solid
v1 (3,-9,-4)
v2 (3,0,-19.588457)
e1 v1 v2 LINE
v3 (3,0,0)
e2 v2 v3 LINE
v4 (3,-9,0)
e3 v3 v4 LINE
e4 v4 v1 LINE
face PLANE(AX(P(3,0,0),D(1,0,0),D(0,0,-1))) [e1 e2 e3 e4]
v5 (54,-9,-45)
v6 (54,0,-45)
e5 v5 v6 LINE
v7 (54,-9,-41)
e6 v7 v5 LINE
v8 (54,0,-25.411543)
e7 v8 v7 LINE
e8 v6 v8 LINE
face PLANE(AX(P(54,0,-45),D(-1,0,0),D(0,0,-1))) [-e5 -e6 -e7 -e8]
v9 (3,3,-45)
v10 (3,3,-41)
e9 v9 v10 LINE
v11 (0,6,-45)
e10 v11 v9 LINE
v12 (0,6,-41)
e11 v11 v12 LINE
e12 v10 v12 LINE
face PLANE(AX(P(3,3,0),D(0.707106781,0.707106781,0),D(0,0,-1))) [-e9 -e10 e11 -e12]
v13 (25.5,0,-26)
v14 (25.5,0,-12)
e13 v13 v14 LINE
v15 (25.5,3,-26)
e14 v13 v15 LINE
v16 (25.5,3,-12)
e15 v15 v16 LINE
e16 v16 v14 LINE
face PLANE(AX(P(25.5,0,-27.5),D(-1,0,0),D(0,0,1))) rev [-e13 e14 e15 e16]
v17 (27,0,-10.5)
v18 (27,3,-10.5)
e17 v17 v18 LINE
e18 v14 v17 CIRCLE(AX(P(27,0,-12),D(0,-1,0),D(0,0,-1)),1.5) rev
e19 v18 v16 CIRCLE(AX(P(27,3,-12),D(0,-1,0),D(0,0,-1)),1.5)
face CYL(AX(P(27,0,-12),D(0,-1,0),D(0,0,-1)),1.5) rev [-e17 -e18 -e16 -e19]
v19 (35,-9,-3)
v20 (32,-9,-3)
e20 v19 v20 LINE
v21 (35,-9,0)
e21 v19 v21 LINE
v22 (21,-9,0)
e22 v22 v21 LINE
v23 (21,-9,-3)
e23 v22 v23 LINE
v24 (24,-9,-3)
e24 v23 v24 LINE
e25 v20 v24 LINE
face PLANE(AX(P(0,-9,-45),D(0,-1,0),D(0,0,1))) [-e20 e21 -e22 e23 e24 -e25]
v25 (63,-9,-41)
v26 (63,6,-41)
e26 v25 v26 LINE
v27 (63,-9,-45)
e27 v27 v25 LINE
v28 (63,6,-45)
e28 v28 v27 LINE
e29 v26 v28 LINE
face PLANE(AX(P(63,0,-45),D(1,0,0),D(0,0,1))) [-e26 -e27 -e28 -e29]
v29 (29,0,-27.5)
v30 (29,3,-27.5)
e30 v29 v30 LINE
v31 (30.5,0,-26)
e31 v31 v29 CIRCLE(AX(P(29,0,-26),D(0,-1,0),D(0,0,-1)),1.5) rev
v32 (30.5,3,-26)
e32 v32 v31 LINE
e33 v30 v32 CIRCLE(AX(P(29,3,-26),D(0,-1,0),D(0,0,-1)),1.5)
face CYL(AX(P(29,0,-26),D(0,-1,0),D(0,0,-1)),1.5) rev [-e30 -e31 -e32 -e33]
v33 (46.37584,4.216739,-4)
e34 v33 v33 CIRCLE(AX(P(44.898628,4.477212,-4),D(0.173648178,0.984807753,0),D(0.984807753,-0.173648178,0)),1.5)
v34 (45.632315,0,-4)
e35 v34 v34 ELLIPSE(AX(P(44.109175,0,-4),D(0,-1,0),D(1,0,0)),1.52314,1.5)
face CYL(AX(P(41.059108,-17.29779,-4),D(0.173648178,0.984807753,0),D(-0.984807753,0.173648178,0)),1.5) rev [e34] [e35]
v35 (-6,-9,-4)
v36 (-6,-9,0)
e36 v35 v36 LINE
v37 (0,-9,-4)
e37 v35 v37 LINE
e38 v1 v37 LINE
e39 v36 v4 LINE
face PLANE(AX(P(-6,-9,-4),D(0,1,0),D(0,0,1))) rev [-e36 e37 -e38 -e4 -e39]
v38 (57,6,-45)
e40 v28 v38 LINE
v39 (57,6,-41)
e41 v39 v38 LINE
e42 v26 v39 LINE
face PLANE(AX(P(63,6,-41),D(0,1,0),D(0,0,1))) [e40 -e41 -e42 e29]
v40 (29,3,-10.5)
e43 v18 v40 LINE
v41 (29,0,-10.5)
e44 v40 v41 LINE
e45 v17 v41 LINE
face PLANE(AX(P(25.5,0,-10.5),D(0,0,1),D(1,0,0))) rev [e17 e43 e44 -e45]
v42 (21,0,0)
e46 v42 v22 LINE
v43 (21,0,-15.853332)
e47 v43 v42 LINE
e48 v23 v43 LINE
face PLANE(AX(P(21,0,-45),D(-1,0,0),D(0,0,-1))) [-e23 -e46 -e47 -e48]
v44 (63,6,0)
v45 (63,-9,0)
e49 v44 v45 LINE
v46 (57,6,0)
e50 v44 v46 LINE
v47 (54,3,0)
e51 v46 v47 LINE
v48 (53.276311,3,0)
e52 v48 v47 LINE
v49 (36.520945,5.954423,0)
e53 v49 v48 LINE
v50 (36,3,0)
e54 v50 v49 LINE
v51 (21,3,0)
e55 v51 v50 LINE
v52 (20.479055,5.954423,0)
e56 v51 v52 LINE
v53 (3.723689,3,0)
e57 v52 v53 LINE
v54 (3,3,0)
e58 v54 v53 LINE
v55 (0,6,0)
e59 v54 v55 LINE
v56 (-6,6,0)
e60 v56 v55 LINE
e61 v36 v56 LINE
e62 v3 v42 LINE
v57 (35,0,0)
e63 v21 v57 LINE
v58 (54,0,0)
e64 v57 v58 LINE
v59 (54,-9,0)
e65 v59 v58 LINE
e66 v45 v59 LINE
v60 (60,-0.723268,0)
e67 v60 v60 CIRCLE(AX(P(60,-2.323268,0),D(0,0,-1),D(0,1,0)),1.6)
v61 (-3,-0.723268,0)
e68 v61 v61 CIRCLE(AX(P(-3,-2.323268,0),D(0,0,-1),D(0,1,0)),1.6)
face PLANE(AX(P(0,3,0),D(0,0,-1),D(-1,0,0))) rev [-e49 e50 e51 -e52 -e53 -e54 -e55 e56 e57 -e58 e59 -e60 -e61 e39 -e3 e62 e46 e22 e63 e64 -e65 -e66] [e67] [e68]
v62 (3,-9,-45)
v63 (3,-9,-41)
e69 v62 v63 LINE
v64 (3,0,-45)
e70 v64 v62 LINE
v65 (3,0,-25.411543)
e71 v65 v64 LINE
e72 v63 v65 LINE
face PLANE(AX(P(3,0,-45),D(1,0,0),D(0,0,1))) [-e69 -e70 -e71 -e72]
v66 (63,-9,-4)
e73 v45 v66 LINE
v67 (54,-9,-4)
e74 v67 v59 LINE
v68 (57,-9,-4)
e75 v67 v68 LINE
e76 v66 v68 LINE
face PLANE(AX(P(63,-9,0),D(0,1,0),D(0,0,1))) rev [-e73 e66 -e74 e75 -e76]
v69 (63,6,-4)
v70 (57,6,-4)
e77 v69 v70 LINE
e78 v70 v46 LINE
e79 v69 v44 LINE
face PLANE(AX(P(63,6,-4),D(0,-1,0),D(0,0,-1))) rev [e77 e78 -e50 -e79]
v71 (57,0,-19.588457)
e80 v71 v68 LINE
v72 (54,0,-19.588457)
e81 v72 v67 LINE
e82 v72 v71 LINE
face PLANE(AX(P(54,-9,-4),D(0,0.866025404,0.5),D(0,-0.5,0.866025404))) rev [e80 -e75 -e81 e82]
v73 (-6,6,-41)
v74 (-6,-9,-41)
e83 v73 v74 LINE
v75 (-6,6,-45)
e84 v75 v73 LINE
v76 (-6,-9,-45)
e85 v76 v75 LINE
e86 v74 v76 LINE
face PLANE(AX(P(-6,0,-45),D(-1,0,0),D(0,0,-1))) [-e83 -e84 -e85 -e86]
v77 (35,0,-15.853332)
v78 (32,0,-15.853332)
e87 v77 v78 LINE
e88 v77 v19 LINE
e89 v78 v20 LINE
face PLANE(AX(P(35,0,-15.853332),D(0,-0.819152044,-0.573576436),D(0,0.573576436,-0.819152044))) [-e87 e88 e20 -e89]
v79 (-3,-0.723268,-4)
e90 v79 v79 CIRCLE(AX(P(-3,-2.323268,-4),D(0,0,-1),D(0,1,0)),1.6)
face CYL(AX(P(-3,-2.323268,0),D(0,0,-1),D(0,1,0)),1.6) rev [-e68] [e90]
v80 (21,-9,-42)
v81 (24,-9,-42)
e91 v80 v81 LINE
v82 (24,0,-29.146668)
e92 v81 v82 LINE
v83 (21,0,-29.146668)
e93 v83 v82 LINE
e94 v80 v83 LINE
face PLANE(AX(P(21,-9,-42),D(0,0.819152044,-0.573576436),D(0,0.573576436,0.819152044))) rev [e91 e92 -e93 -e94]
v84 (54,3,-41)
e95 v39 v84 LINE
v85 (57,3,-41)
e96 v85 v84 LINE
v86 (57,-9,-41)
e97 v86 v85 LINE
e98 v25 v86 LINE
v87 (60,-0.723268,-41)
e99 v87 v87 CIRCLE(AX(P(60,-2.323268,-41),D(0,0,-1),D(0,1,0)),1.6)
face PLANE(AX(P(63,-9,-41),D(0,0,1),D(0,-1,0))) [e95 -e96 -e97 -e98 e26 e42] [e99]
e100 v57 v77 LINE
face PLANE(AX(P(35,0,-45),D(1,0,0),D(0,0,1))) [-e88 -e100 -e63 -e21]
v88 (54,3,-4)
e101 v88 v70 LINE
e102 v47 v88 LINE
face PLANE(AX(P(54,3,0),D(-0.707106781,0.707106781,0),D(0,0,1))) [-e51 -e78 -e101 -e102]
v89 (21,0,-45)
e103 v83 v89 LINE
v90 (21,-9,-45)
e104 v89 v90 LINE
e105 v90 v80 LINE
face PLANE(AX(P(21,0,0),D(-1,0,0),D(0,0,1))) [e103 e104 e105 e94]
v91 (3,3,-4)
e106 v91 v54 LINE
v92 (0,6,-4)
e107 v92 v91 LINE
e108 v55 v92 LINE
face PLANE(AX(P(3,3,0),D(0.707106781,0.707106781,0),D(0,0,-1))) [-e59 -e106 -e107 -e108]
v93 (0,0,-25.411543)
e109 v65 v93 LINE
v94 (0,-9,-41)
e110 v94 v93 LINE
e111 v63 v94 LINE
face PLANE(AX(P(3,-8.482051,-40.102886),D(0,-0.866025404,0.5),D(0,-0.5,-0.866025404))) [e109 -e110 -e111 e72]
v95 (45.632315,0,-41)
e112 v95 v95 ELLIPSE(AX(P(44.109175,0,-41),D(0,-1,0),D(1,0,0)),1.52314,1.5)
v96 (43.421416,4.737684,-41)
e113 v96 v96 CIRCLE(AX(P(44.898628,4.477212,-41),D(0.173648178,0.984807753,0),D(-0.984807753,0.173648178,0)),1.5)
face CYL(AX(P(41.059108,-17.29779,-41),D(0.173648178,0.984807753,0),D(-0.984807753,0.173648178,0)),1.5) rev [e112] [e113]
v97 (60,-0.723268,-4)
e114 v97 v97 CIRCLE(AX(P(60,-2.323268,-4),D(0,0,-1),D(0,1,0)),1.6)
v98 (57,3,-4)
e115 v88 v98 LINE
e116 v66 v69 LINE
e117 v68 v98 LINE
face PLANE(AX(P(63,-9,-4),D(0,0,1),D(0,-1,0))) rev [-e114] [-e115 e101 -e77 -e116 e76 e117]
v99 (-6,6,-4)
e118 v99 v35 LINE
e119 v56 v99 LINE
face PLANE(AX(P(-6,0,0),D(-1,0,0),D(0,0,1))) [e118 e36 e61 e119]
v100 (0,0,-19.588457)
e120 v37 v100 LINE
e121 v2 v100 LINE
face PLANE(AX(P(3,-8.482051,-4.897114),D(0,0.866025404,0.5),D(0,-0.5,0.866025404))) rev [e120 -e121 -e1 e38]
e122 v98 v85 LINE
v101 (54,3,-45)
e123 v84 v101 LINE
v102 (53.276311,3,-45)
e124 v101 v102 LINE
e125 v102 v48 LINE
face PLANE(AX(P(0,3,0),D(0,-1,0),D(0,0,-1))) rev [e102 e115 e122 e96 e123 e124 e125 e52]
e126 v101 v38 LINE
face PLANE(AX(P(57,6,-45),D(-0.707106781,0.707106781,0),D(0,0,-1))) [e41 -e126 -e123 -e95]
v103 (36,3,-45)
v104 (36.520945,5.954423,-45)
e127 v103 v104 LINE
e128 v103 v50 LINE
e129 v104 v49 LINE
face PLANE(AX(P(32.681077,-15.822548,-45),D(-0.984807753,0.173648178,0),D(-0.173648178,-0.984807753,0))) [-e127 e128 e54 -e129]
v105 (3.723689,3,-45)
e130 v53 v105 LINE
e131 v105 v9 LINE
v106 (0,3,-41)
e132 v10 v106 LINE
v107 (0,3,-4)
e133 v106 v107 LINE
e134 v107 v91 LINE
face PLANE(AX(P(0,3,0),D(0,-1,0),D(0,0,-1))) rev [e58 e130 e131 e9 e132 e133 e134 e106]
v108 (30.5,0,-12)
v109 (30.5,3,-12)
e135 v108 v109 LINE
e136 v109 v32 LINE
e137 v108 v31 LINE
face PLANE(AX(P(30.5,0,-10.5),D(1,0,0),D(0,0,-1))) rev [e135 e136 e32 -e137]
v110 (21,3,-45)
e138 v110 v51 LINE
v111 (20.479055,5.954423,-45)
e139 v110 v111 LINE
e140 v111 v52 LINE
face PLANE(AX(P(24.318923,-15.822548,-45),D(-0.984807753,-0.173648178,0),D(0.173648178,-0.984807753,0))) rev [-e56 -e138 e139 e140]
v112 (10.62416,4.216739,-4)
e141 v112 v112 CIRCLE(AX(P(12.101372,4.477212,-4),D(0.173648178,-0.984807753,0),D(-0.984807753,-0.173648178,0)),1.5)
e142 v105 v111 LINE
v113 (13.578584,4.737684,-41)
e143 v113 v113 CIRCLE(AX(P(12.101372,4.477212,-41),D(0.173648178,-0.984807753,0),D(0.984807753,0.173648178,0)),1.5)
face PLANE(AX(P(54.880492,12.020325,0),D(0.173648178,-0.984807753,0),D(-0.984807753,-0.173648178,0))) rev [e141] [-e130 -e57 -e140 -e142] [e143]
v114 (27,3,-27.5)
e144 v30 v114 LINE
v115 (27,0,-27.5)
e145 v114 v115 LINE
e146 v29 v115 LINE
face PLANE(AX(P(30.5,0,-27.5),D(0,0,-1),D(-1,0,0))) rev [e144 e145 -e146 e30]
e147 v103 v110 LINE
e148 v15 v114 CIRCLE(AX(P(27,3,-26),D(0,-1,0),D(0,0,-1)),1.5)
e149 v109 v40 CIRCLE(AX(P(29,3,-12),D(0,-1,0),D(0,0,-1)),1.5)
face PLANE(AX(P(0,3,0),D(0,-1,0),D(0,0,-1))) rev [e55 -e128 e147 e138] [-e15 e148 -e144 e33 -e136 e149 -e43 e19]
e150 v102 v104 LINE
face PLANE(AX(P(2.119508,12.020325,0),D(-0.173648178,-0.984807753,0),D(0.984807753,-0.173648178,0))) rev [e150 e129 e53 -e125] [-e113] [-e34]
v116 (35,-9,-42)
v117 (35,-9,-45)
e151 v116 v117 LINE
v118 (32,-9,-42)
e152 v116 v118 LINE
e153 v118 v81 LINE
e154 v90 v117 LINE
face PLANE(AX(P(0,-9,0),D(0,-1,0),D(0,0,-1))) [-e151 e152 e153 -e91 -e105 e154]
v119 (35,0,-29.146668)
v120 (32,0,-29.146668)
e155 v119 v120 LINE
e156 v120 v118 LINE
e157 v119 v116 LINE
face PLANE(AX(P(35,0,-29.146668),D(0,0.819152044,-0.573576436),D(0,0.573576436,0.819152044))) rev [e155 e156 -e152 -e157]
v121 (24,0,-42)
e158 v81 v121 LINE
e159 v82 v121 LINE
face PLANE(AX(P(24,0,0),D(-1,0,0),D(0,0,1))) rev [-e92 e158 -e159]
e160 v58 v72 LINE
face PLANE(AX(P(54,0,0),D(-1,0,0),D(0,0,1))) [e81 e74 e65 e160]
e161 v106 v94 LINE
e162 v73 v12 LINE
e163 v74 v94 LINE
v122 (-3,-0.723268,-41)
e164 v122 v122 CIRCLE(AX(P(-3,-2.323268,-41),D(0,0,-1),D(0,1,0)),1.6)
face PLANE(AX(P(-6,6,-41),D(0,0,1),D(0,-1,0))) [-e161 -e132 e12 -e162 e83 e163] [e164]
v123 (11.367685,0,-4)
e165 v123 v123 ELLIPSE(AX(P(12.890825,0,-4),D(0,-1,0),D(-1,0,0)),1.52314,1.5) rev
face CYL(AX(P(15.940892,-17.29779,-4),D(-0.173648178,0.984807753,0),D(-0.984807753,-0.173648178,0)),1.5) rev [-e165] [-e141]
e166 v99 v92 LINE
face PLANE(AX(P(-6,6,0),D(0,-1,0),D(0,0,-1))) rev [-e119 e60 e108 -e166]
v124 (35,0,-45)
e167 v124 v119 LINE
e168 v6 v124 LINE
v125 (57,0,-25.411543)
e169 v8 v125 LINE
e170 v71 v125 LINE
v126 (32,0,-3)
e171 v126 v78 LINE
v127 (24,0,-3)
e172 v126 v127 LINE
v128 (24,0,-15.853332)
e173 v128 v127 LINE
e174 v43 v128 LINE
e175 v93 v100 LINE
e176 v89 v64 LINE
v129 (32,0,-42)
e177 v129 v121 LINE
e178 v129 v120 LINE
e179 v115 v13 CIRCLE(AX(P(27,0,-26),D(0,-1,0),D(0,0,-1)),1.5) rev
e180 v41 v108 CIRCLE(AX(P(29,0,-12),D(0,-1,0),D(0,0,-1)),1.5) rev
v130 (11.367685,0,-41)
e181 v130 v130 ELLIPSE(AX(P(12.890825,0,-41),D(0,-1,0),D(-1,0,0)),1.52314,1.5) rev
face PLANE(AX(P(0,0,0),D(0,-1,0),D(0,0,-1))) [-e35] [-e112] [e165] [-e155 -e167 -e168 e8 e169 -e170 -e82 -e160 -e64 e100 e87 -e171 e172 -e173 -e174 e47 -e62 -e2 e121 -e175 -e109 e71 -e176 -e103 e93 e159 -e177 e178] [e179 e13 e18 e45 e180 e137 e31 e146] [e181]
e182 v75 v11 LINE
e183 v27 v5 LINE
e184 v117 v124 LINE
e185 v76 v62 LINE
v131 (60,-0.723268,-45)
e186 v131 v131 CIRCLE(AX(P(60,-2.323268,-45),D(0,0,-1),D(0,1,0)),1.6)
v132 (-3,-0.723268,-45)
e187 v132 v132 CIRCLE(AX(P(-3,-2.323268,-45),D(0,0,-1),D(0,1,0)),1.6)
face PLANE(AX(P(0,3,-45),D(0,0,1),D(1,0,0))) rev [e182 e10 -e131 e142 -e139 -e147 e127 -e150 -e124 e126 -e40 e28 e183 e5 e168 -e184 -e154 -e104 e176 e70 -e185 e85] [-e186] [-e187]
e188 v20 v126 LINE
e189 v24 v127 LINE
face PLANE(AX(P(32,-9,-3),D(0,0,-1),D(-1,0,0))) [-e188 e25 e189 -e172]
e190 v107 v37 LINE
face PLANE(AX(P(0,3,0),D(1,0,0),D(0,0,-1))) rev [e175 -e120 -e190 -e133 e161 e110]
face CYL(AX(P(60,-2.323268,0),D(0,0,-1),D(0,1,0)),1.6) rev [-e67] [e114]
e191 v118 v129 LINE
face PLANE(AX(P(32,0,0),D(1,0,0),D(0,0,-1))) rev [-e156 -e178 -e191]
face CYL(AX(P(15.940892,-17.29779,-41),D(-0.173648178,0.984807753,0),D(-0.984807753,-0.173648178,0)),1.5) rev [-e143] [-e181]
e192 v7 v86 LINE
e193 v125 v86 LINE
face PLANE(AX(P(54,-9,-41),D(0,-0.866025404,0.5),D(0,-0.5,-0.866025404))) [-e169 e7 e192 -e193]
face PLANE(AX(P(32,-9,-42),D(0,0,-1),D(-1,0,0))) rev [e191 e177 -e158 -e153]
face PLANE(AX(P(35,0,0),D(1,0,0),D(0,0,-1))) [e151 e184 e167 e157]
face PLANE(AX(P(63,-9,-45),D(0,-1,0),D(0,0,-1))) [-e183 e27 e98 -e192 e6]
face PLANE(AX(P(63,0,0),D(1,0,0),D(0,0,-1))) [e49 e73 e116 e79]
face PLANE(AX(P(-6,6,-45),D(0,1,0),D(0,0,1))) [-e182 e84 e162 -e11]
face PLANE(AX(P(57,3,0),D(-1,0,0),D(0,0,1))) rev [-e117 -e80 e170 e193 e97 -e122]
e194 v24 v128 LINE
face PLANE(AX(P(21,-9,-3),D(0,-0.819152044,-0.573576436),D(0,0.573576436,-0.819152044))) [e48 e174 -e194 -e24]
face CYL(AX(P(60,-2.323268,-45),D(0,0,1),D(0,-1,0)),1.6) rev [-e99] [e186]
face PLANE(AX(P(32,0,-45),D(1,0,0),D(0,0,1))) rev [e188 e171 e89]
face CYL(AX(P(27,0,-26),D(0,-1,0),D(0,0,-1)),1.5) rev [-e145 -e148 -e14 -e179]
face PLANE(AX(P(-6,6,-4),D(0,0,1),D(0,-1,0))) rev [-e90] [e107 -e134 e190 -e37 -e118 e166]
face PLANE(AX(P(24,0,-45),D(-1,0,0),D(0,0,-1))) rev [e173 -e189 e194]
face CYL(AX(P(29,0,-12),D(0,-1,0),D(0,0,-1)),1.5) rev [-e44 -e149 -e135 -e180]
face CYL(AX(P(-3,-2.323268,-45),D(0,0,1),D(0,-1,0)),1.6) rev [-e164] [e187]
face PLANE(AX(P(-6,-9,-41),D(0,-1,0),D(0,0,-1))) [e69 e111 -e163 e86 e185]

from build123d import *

# Parameters (mm, degrees)
SKETCH_1_W                 = 57
SKETCH_1_H                 = 45
EXTRUDE_1_DEPTH            = 3
SKETCH_2_W                 = 4
SKETCH_2_H                 = 15
EXTRUDE_2_DEPTH            = 6
SKETCH_3_W                 = 4
SKETCH_3_H                 = 15
EXTRUDE_3_DEPTH            = 6
EXTRUDE_4_DEPTH            = 3
SKETCH_5_W                 = 4
SKETCH_5_H                 = 9
EXTRUDE_5_DEPTH            = 3
CHAMFER_1_SIZE             = 3
SKETCH_6_R                 = 1.6
CUT_EXTRUDE_1_DEPTH        = 4
SKETCH_8_W                 = 8
SKETCH_8_H                 = 3
EXTRUDE_6_DEPTH            = 9
EXTRUDE_7_DEPTH            = 3
EXTRUDE_8_DEPTH            = 3
SKETCH_12_W                = 5
SKETCH_12_H                = 17
CUT_EXTRUDE_4_DEPTH        = 3
FILLET_1_R                 = 1.5
EXTRUDE_9_REACH            = 80.57
SKETCH_15_W                = 45
SKETCH_15_H                = 17.726539555
SKETCH_16_R                = 1.5
CUT_EXTRUDE_5_DEPTH        = 79.570276896
CHAMFER_1_OF_MIRROR_2_SIZE = 3


with BuildPart() as part:
    # 草图1 → 凸台-拉伸1 (new body)
    with BuildSketch(Plane(origin=(0, 0, 0), x_dir=(1, 0, 0), z_dir=(0, 1, 0))):
        with Locations((28.5, 22.5)):
            Rectangle(SKETCH_1_W, SKETCH_1_H)
    extrude(amount=EXTRUDE_1_DEPTH)

    # 草图2 → 凸台-拉伸2 (add)
    with BuildSketch(Plane.ZY):
        with Locations((-2, -1.5)):
            Rectangle(SKETCH_2_W, SKETCH_2_H)
    extrude_2 = extrude(amount=EXTRUDE_2_DEPTH)

    # 草图3 → 凸台-拉伸3 (add)
    with BuildSketch(Plane(origin=(57, 0, 0), x_dir=(0, 0, -1), z_dir=(1, 0, 0))):
        with Locations((2, -1.5)):
            Rectangle(SKETCH_3_W, SKETCH_3_H)
    extrude_3 = extrude(amount=EXTRUDE_3_DEPTH)

    # 草图4 → 凸台-拉伸4 (add)
    with BuildSketch(Plane.ZY.offset(-57)):
        Polygon((-4, -9), (-19.588457268, 0), (0, 0), (0, -9), align=None)
    extrude_4 = extrude(amount=EXTRUDE_4_DEPTH)

    # 草图5 → 凸台-拉伸5 (add)
    with BuildSketch(Plane(origin=(0, 0, 0), x_dir=(0, 0, -1), z_dir=(1, 0, 0))):
        Polygon((19.588457268, 0), (4, 0), (4, -9), align=None)
        with Locations((2, -4.5)):
            Rectangle(SKETCH_5_W, SKETCH_5_H)
    extrude_5 = extrude(amount=EXTRUDE_5_DEPTH)

    # 倒角1
    chamfer_1_edges = [part.edges().sort_by_distance(p)[0] for p in [
        (0, 3, -2),
        (57, 3, -2),
    ]]
    chamfer(chamfer_1_edges, length=CHAMFER_1_SIZE - 0.0001)  # a hair under: the kernel refuses the full size

    # 草图6 → 切除-拉伸1 (cut)
    with BuildSketch(Plane(origin=(0, 0, -4), x_dir=(-1, 0, 0), z_dir=(0, 0, -1))):
        with Locations(Location((3, -2.323268139, 0), (0, 0, 90))):
            Circle(SKETCH_6_R)
        with Locations(Location((-60, -2.323268139, 0), (0, 0, 90))):
            Circle(SKETCH_6_R)
    cut_extrude_1 = extrude(amount=-CUT_EXTRUDE_1_DEPTH, mode=Mode.SUBTRACT)

    # 草图8 → 凸台-拉伸6 (add)
    with BuildSketch(Plane.XZ):
        with Locations((28, -43.5)):
            Rectangle(SKETCH_8_W, SKETCH_8_H)
    extrude_6 = extrude(amount=EXTRUDE_6_DEPTH)

    # 草图9 → 凸台-拉伸7 (add)
    with BuildSketch(Plane(origin=(32, 0, 0), x_dir=(0, 0, -1), z_dir=(1, 0, 0))):
        Polygon((45, 0), (29.146667939, 0), (42, -9), (45, -9), align=None)
    extrude_7 = extrude(amount=EXTRUDE_7_DEPTH)

    # 草图10 → 凸台-拉伸8 (add)
    with BuildSketch(Plane.ZY.offset(-24)):
        Polygon((-45, 0), (-45, -9), (-42, -9), (-29.146667939, 0), align=None)
    extrude_8 = extrude(amount=EXTRUDE_8_DEPTH)

    # 草图12 → 切除-拉伸4 (cut)
    with BuildSketch(Plane(origin=(0, 3, 0), x_dir=(1, 0, 0), z_dir=(0, 1, 0))):
        with Locations((28, 19)):
            Rectangle(SKETCH_12_W, SKETCH_12_H)
    extrude(amount=-CUT_EXTRUDE_4_DEPTH, mode=Mode.SUBTRACT)

    # 圆角1
    fillet_1_edges = [part.edges().sort_by_distance(p)[0] for p in [
        (25.5, 1.5, -27.5),
        (30.5, 1.5, -27.5),
        (30.5, 1.5, -10.5),
        (25.5, 1.5, -10.5),
    ]]
    fillet(fillet_1_edges, radius=FILLET_1_R)

    # 草图15 → 凸台-拉伸9 (add, up to next)
    with BuildSketch(Plane(origin=(2.119507574, 12.02032477, 0), x_dir=(0, 0, 1), z_dir=(0.17364817766693066, 0.9848077530122081, 0)), mode=Mode.PRIVATE) as extrude_9_sk1:
        with Locations((-22.5, 43.795404353)):
            Rectangle(SKETCH_15_W, SKETCH_15_H)
    extrude_9_tool1 = extrude(extrude_9_sk1.sketch, amount=-EXTRUDE_9_REACH, mode=Mode.PRIVATE) - part.part
    extrude_9 = extrude_9_tool1.solids().sort_by_distance((45.249561, 4.415333, -22.5))[0]
    add(extrude_9)

    # 草图16 → 切除-拉伸5 (cut, through all)
    with BuildSketch(Plane(origin=(2.119507574, 12.02032477, 0), x_dir=(0.9848077530122081, -0.17364817766693064, 0), z_dir=(0.17364817766693064, 0.9848077530122081, 0))):
        with Locations(Location((43.439057305, 41, 0), (0, 0, 180))):
            Circle(SKETCH_16_R)
        with Locations((43.439057305, 4)):
            Circle(SKETCH_16_R)
    cut_extrude_5 = extrude(amount=-CUT_EXTRUDE_5_DEPTH, mode=Mode.SUBTRACT)

    # 镜向1: 凸台-拉伸9, 切除-拉伸5 across plane
    add(extrude_9.mirror(Plane(origin=(28.5, 0, 0), x_dir=(0, 0, 1), z_dir=(1, 0, 0))))
    add(cut_extrude_5.mirror(Plane(origin=(28.5, 0, 0), x_dir=(0, 0, 1), z_dir=(1, 0, 0))), mode=Mode.SUBTRACT)

    # 镜向2: 凸台-拉伸2, 凸台-拉伸3, 凸台-拉伸4, 凸台-拉伸5, 切除-拉伸1 across plane
    add(extrude_2.mirror(Plane.XY.offset(-22.5)))
    add(extrude_3.mirror(Plane.XY.offset(-22.5)))
    add(extrude_4.mirror(Plane.XY.offset(-22.5)))
    add(extrude_5.mirror(Plane.XY.offset(-22.5)))
    add(cut_extrude_1.mirror(Plane.XY.offset(-22.5)), mode=Mode.SUBTRACT)

    # 倒角1 of 镜向2
    chamfer_1_of_mirror_2_edges = [part.edges().sort_by_distance(p)[0] for p in [
        (0, 3, -43),
        (57, 3, -43),
    ]]
    chamfer(chamfer_1_of_mirror_2_edges, length=CHAMFER_1_OF_MIRROR_2_SIZE - 0.0001)  # a hair under: the kernel refuses the full size

    # 镜向3: 凸台-拉伸6, 凸台-拉伸7, 凸台-拉伸8 across plane
    add(extrude_6.mirror(Plane.XY.offset(-22.5)))
    add(extrude_7.mirror(Plane.XY.offset(-22.5)))
    add(extrude_8.mirror(Plane.XY.offset(-22.5)))


solid = part.part
